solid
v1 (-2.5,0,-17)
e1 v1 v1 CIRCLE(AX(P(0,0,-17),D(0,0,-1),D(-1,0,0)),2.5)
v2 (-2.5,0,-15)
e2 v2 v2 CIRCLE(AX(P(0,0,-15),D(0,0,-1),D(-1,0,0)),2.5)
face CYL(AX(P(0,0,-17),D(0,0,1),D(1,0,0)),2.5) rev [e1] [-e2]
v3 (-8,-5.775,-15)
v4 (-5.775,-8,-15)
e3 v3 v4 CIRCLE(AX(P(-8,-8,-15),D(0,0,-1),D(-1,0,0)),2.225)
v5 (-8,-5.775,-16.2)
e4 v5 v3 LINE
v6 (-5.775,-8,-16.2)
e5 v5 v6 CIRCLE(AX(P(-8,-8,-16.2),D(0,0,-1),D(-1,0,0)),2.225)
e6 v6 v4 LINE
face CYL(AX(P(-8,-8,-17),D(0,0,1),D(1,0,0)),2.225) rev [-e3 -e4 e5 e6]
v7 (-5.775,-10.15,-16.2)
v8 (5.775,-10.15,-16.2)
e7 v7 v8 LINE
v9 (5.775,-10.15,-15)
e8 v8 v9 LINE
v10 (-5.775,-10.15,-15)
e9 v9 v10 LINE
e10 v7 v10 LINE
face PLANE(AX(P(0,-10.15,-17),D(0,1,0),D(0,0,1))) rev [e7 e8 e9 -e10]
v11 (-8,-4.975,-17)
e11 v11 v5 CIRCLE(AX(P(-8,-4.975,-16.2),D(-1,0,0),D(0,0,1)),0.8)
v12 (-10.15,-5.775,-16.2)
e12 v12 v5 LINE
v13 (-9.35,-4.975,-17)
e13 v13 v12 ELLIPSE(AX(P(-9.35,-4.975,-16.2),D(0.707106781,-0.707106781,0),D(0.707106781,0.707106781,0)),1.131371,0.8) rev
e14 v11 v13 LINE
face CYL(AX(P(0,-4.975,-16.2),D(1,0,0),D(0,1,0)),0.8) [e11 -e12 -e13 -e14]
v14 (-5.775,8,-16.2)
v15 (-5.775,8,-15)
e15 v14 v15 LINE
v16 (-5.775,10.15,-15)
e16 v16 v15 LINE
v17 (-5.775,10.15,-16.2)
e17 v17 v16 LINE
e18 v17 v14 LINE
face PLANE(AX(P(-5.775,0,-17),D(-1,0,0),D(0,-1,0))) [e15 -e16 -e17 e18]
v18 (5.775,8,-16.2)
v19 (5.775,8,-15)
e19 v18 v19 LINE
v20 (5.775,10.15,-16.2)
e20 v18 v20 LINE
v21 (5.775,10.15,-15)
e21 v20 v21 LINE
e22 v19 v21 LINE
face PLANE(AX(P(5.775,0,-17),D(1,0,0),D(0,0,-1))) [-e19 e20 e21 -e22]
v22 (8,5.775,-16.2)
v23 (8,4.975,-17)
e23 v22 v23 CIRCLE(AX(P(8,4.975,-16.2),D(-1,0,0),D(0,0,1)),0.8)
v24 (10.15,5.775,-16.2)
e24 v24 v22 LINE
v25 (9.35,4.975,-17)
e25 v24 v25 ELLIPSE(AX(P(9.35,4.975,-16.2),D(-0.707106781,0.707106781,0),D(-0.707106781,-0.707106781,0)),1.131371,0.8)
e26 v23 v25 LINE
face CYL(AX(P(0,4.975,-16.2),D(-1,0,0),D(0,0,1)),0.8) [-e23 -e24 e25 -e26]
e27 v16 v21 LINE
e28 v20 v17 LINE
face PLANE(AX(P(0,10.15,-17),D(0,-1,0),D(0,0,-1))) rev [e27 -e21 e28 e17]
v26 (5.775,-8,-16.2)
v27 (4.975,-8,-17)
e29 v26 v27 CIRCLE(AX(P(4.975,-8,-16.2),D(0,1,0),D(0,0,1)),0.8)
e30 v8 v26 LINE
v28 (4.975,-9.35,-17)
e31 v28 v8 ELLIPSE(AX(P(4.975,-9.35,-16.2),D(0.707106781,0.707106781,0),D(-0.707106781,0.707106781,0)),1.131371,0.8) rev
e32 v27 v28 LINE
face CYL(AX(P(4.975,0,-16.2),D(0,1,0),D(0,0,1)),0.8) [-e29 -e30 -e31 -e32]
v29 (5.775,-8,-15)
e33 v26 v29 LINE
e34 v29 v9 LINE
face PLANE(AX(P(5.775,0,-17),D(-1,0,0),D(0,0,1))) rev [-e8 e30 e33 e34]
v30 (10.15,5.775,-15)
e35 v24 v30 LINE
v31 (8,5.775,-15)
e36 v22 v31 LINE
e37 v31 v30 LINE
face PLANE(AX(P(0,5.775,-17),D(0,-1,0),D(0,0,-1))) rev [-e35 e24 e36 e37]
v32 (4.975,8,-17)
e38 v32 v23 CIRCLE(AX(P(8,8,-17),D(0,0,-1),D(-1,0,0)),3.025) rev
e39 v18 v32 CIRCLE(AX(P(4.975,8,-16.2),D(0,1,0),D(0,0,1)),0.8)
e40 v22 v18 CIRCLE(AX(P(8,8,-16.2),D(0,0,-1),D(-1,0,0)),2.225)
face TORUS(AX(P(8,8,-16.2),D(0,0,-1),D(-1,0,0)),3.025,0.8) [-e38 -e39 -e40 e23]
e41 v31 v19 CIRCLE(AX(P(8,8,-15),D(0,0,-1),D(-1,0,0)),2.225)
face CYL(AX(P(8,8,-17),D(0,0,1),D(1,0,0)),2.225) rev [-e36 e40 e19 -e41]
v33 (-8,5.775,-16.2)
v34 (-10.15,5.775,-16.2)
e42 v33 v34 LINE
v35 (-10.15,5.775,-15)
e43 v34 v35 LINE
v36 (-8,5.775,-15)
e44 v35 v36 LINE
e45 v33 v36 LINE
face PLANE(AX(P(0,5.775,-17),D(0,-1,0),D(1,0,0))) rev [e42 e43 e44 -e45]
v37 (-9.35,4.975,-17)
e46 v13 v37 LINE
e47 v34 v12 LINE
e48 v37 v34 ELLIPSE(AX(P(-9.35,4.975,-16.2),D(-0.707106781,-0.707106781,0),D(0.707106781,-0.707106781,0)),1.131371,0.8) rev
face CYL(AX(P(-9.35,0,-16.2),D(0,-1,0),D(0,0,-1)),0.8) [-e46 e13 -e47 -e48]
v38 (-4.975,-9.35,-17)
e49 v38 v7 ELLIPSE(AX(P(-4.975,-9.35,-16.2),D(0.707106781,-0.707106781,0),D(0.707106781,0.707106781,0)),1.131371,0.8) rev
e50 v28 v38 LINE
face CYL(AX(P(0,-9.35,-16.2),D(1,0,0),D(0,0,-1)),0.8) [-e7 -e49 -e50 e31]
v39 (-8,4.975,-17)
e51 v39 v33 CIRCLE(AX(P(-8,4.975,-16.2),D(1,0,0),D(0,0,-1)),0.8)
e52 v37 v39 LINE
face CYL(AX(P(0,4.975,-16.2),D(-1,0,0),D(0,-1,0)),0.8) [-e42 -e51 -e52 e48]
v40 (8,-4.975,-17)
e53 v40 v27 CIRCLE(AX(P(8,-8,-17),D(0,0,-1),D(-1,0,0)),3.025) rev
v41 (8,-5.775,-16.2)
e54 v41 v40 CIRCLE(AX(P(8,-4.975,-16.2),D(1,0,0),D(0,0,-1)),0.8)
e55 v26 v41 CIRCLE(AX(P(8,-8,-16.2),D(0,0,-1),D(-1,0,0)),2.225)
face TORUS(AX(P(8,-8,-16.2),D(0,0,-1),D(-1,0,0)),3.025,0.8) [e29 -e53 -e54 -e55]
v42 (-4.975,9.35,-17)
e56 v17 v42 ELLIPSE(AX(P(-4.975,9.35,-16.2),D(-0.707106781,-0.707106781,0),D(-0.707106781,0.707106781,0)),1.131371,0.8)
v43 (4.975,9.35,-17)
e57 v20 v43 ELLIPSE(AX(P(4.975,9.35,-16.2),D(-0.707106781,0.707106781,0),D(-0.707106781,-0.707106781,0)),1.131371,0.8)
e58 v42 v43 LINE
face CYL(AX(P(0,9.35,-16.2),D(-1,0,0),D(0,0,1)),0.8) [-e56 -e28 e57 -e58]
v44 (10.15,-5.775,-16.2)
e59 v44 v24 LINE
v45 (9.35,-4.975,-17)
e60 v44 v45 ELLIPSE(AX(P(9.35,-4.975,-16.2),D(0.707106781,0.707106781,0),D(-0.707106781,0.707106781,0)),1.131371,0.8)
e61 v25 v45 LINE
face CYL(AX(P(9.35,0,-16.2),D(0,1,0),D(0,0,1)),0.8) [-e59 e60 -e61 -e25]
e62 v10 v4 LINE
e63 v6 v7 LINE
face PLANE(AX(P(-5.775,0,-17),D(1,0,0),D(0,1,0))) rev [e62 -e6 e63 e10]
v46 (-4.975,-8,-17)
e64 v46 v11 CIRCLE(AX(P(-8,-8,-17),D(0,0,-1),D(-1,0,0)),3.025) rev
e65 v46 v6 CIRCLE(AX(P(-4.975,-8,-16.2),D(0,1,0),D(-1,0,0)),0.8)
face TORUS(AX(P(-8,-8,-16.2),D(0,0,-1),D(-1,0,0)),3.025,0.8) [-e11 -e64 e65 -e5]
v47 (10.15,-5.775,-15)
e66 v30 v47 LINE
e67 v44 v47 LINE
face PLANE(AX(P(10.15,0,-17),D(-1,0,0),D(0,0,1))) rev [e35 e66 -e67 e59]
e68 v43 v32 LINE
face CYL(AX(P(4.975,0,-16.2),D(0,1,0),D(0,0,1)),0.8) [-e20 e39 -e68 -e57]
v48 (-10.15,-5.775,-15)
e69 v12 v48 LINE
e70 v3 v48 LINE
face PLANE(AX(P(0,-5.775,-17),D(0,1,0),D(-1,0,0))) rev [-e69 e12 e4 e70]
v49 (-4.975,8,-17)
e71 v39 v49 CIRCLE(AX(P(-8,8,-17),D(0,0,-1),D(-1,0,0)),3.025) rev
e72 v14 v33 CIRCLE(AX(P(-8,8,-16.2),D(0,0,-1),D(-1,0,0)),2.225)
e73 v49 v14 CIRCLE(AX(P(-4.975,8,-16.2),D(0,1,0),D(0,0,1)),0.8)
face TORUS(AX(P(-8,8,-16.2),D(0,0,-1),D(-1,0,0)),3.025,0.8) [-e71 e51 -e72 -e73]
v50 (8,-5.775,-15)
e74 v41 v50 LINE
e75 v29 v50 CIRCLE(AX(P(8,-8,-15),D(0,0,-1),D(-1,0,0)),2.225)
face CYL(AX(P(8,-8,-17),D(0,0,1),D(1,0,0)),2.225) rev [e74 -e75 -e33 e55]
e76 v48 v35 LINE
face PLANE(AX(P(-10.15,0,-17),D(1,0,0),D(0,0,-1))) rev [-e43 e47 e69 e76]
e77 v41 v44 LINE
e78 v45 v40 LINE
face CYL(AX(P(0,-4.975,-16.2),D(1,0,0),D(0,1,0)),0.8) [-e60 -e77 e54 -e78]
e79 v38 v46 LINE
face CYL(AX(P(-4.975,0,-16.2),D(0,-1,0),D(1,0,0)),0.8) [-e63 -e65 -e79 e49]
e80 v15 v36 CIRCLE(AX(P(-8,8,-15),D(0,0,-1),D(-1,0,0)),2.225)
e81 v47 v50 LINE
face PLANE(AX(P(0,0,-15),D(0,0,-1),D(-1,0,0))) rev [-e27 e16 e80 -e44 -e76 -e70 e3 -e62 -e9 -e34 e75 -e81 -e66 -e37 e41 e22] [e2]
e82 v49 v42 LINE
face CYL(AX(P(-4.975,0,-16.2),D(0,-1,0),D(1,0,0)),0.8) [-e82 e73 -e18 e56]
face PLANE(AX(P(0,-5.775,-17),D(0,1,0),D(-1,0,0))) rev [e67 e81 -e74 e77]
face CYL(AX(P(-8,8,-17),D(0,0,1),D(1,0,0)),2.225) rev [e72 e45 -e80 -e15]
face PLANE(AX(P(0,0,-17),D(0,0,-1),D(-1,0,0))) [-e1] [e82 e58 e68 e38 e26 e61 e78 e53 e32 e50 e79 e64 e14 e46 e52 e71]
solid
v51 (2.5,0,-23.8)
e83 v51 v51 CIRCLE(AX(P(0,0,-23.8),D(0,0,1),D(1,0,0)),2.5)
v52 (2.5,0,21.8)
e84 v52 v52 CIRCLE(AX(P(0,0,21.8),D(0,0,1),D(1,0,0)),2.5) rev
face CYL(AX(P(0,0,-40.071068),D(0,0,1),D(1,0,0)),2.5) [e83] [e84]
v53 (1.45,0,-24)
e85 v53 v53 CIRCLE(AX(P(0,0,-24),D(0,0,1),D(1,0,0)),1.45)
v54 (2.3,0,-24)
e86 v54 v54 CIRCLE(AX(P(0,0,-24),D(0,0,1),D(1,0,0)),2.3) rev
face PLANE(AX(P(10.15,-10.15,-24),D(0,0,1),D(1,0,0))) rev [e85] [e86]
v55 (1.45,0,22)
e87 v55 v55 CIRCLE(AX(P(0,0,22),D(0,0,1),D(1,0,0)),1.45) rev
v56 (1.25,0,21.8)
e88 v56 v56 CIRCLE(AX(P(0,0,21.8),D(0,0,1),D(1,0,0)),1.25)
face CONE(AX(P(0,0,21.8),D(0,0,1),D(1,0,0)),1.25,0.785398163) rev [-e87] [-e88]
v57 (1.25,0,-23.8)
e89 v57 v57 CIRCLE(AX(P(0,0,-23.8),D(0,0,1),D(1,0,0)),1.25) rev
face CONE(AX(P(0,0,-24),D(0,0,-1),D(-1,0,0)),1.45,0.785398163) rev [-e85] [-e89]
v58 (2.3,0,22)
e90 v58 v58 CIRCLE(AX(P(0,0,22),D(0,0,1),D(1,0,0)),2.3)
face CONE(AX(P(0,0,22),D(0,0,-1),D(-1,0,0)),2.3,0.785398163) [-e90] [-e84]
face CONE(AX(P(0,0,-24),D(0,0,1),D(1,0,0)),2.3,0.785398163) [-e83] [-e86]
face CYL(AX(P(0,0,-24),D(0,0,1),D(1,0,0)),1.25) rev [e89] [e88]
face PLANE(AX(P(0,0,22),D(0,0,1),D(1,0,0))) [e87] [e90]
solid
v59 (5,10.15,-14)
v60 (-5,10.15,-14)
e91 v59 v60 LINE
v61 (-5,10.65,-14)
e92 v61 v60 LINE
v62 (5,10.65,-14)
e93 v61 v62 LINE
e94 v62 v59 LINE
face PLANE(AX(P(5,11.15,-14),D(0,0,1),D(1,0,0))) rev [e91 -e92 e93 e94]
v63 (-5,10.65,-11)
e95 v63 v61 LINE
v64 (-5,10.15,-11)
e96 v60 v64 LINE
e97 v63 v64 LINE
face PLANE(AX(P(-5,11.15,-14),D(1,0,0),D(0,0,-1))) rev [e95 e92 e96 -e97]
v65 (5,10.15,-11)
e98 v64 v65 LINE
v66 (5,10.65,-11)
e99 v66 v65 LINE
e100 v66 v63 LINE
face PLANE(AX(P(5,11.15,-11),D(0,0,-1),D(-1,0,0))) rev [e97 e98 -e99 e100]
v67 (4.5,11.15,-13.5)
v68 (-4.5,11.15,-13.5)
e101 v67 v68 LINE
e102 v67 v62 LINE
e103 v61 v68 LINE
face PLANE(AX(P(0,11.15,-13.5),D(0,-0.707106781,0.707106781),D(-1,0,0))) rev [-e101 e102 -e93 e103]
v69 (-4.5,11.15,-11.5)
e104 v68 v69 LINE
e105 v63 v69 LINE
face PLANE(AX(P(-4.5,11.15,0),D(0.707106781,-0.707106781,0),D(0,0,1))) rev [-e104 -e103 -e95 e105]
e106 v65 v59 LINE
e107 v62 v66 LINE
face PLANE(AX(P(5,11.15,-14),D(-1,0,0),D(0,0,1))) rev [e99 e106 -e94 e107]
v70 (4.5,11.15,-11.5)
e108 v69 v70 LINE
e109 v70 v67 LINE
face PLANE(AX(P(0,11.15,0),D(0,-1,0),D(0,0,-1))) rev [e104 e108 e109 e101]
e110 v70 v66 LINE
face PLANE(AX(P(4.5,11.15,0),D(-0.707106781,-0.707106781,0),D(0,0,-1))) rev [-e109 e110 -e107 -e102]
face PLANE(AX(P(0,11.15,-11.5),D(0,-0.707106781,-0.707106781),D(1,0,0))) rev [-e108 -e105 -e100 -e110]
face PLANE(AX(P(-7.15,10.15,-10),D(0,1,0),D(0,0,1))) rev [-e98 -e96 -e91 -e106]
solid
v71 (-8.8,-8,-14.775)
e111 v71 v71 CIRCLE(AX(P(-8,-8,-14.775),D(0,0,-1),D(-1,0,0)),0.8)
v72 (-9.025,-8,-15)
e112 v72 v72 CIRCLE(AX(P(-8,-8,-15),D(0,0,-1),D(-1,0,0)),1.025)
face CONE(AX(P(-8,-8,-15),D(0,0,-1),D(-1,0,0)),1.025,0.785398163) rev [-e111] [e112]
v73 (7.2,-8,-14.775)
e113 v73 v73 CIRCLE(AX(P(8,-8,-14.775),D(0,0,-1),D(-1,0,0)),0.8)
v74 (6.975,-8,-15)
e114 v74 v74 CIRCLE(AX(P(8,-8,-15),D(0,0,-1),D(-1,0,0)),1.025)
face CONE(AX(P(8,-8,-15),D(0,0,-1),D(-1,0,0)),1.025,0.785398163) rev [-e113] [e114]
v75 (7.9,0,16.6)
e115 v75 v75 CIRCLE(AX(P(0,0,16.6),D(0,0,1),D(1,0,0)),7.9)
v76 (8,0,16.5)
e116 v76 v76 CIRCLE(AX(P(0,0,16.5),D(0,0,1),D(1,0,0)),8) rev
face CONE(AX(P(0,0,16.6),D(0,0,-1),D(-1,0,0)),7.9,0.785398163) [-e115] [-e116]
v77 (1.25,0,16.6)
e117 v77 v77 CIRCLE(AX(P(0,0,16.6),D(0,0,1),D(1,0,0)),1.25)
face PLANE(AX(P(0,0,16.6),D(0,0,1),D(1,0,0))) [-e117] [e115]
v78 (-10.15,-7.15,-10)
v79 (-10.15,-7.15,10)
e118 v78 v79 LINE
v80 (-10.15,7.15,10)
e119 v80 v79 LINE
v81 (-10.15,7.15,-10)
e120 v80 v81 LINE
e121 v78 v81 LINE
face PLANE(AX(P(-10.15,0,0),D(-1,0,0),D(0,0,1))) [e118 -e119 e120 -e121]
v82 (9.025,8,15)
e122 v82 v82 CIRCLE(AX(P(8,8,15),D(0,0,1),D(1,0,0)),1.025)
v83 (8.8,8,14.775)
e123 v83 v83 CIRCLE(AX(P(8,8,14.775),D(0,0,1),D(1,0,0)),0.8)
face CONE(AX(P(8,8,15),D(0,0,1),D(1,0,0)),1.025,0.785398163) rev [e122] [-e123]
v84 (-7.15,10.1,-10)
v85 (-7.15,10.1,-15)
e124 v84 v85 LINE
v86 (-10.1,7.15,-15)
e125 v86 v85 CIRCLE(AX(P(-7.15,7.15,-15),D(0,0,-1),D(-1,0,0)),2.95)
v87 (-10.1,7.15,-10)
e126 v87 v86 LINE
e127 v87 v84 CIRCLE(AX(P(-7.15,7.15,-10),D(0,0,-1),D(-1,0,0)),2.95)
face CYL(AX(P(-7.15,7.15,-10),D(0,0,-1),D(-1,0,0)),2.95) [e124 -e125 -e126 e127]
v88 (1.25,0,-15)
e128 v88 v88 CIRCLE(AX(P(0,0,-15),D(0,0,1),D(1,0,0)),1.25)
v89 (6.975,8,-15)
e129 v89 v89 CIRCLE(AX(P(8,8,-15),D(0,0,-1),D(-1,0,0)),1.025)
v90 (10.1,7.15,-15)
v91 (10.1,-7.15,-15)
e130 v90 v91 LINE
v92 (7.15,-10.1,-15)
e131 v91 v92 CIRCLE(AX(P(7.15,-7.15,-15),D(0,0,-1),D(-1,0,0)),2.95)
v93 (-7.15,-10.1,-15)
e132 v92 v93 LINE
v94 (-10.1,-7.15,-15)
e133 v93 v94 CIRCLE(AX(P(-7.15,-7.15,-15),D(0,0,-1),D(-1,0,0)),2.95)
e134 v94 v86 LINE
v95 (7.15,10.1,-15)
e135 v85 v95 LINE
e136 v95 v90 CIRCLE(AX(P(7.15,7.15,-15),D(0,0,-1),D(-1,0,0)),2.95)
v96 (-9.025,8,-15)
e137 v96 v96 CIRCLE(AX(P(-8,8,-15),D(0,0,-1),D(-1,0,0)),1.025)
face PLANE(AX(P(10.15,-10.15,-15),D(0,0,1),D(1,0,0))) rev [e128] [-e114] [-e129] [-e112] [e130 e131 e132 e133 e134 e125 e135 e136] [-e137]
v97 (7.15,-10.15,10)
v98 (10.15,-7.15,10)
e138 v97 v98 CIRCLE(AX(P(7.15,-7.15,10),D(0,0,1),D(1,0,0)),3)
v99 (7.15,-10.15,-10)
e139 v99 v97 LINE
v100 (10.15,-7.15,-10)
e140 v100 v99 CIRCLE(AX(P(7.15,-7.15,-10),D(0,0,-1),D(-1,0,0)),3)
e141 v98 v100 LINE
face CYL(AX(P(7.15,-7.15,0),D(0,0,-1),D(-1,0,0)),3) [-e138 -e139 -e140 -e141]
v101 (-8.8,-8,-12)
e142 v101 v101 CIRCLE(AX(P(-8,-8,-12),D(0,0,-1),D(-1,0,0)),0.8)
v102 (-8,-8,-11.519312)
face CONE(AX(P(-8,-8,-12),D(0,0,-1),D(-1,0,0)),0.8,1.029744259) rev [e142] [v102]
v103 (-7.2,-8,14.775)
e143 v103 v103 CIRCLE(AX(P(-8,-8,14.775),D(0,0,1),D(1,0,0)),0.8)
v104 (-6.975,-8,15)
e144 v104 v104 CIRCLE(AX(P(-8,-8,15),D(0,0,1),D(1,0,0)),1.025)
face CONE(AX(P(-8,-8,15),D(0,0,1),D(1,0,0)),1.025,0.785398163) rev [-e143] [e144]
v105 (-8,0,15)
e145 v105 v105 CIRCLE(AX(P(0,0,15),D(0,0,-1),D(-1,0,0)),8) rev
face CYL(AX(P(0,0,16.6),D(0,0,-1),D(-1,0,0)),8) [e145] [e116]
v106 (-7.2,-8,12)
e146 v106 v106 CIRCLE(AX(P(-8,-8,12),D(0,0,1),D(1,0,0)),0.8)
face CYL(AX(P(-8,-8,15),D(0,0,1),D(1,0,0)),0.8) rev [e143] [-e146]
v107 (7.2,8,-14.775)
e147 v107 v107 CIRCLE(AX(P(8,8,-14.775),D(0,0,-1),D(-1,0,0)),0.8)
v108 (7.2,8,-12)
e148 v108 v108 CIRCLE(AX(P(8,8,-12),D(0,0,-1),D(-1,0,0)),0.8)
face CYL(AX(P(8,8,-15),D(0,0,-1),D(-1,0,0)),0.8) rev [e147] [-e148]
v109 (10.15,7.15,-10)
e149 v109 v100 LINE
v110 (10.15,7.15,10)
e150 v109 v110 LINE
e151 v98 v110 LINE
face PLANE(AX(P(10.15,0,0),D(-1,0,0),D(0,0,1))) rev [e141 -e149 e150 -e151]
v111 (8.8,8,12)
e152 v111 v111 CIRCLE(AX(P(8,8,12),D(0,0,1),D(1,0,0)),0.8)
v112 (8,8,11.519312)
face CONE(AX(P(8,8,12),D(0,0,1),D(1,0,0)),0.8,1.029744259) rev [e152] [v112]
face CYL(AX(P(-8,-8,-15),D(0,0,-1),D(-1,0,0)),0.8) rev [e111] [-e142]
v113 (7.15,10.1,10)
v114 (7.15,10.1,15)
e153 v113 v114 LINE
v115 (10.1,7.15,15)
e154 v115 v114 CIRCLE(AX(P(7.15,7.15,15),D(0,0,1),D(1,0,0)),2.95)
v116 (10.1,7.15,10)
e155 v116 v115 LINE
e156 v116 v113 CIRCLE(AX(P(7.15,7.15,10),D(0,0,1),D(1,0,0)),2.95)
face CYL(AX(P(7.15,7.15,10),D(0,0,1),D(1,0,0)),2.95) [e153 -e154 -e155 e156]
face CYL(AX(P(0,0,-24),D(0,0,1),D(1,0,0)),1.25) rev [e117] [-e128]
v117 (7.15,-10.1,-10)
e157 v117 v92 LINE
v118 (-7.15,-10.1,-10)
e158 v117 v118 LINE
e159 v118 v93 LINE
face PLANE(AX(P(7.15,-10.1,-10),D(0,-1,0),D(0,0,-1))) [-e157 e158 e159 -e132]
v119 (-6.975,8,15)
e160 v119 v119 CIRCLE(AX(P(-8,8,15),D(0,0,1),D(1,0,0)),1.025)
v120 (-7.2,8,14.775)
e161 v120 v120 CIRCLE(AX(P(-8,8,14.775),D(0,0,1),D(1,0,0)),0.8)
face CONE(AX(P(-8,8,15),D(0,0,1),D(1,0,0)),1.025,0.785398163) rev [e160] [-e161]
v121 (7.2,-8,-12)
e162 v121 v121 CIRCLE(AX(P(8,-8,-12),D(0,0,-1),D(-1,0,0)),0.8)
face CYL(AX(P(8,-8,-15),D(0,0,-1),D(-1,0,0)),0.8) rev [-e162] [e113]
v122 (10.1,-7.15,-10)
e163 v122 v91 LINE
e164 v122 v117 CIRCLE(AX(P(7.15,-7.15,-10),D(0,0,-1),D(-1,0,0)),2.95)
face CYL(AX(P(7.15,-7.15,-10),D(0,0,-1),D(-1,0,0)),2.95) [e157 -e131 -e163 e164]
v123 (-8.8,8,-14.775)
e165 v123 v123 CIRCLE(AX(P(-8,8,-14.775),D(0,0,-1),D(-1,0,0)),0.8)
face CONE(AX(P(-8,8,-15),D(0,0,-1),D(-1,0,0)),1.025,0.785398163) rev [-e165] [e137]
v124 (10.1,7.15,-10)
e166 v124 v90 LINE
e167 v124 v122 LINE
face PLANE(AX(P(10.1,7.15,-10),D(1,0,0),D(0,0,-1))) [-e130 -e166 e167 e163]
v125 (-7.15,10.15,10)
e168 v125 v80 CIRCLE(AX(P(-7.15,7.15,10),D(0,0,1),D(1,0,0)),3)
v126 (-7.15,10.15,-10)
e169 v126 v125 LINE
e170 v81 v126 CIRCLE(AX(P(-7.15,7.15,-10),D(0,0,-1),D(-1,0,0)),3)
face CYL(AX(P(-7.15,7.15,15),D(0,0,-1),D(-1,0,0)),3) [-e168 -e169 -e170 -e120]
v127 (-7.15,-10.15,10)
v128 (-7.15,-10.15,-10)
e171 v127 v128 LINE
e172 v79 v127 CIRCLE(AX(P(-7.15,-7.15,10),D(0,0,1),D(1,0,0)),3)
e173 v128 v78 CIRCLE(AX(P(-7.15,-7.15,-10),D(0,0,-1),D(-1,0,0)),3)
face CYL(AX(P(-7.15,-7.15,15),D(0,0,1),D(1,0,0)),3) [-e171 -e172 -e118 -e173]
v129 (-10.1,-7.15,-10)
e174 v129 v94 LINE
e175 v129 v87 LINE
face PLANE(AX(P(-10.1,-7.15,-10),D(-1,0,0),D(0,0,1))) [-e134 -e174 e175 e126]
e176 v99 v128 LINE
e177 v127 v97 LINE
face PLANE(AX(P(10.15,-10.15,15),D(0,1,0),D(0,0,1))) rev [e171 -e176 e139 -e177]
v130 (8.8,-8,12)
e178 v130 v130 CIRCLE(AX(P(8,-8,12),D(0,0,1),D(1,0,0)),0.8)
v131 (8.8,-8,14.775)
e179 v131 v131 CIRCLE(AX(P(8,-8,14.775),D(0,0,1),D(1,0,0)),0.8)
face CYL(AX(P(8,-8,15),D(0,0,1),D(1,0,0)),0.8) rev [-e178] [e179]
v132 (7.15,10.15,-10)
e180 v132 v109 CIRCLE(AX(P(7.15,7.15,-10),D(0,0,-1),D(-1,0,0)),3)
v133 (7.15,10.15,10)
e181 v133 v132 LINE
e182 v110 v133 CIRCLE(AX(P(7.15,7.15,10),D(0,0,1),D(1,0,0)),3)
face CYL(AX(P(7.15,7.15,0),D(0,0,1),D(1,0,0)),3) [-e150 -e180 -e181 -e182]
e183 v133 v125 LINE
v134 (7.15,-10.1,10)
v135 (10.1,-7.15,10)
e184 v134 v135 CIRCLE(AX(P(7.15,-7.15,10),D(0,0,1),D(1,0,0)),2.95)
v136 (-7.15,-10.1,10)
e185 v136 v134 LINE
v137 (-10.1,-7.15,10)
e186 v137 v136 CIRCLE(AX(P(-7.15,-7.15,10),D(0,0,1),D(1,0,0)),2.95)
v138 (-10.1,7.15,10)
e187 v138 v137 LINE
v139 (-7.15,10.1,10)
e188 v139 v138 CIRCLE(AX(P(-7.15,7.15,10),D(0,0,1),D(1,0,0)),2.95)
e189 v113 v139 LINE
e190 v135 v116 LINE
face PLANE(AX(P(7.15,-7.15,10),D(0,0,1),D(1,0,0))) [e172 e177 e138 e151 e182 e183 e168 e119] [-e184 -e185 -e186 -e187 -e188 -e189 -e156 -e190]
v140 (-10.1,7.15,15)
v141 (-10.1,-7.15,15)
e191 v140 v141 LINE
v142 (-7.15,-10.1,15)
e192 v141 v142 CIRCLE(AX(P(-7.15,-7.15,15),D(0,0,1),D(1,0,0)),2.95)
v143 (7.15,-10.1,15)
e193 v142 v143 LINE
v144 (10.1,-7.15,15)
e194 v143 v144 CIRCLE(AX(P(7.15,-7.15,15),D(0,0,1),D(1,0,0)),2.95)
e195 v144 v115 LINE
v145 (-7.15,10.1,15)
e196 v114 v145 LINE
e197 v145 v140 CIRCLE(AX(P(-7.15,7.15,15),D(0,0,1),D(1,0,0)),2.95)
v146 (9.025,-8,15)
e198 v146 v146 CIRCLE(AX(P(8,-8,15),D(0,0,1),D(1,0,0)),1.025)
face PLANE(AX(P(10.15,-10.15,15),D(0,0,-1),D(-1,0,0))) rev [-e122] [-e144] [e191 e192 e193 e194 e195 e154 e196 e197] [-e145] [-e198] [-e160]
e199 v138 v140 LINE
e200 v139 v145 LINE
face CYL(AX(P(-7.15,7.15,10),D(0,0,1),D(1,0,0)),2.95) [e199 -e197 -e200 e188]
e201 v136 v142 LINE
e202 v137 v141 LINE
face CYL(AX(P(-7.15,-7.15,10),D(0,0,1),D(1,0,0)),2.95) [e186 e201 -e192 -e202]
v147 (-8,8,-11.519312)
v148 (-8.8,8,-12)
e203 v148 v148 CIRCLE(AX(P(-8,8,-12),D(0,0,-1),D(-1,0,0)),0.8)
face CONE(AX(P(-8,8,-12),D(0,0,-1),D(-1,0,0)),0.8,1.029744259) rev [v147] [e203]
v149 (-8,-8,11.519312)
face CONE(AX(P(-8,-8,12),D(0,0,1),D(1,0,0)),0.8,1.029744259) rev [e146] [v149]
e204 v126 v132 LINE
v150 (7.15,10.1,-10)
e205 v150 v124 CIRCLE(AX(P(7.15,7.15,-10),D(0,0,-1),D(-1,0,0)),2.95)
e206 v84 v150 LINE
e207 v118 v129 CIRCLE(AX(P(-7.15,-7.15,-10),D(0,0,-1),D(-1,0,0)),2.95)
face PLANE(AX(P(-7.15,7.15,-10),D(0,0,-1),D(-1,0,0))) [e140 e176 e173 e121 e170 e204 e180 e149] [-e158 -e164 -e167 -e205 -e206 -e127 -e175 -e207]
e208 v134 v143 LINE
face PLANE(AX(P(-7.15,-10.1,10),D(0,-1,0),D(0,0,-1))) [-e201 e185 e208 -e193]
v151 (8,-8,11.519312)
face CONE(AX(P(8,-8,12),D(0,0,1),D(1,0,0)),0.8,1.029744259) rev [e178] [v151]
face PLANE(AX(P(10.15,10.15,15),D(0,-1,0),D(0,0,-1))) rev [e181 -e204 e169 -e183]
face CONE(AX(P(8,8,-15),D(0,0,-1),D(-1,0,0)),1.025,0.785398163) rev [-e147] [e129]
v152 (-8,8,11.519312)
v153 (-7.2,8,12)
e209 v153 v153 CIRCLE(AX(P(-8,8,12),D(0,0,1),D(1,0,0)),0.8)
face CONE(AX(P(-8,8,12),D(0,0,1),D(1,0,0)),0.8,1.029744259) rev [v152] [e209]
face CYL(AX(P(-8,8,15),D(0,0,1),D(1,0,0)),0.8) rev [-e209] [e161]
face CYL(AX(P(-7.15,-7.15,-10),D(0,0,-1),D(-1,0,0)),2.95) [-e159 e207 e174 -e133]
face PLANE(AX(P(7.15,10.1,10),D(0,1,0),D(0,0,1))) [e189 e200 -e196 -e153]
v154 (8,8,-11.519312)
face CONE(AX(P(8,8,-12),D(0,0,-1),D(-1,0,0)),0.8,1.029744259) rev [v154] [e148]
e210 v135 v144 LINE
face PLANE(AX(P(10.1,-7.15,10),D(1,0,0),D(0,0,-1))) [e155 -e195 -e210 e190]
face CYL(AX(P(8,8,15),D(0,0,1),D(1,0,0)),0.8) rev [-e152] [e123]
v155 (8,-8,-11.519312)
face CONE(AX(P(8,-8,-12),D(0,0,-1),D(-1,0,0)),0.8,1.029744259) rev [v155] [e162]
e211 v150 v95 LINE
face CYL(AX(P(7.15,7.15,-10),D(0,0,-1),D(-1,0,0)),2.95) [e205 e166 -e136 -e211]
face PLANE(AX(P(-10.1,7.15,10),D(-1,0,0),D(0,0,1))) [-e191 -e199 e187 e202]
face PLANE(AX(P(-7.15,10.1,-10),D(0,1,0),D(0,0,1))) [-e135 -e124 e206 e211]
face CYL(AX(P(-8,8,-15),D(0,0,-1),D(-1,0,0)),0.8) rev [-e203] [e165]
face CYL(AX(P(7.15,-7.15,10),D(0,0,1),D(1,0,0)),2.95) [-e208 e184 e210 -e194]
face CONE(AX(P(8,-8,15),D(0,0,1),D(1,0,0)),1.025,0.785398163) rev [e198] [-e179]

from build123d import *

# Parameters (mm, degrees)
MAIN_SKETCH_W                          = 30
MAIN_SKETCH_H                          = 20.3
MAIN_BODY_EXTRUDE_DEPTH                = 10.15
BOTTOM_CIRCULAR_PROTRUSION_SKETCH_R    = 8
BOTTOM_CIRCULAR_PROTRUSION_DEPTH       = 1.6
BOTTOM_PROTRUSION_CHAMFER_SIZE         = 0.1
SHAFT_OUTSIDE_DEPTH                    = 5.4
SHAFT_OUTSIDE_DEPTH_BACK               = 40.6
SHAFT_OUTSIDE_SKETCH_R                 = 2.5
HOLLOW_OUT_SHAFT_CUT_DEPTH             = 49.18760214
HOLLOW_OUT_SHAFT_CUT_DEPTH_BACK        = 49.18760214
SKETCH4_R                              = 1.25
SHAFT_CHAMFER_SIZE                     = 0.2
MOUNTING_HOLE_LOCATION_SKETCH_R        = 0.5
MOUNTING_HOLE_CUT_LOCATIONS_DEPTH      = 2
ASSEMBLY_START                         = -2
ASSEMBLY_SCREW_HOLES_POSITION_SKETCH_R = 0.5
ASSEMBLY_SCREW_HOLES_DEPTH             = 2
BODY_CORNER_FILLETS_R                  = 3
COVER_SKETCH_R                         = 2.5
COVER_EXTRUDE_DEPTH                    = 2
COVER_FILLET_R                         = 0.8
CONNECTOR_SKETCH_W                     = 10
CONNECTOR_SKETCH_H                     = 3
CONNECTOR_EXTRUDE_DEPTH                = 1
CONNECTOR_CHAMFER_SIZE                 = 0.5
BODY_BOTTOM_TRIM_DEPTH                 = 5
BODY_START                             = -5
BODY_TOP_TRIM_DEPTH                    = 5


# Read off the part's stored shape, not the designer's step: M2 Tapped Holes
with BuildPart() as part:
    # Main Sketch → Main Body Extrude (new, symmetric)
    with BuildSketch(Plane(origin=(0, 0, 0), x_dir=(0, 0, -1), z_dir=(1, 0, 0))):
        Rectangle(MAIN_SKETCH_W, MAIN_SKETCH_H)
    extrude(amount=MAIN_BODY_EXTRUDE_DEPTH, both=True)

    # Bottom Circular Protrusion Sketch → Bottom Circular Protrusion (add)
    with BuildSketch(Plane.XY.offset(15)):
        with Locations(Location((0, 0, 0), (0, 0, 180))):
            Circle(BOTTOM_CIRCULAR_PROTRUSION_SKETCH_R)
    extrude(amount=BOTTOM_CIRCULAR_PROTRUSION_DEPTH)

    # Bottom Protrusion Chamfer
    bottom_protrusion_chamfer_edges = [part.edges().sort_by_distance(p)[0] for p in [
        (8, 0, 16.6),
    ]]
    chamfer(bottom_protrusion_chamfer_edges, length=BOTTOM_PROTRUSION_CHAMFER_SIZE)


with BuildPart() as body_2:
    # Shaft Outside Sketch → Shaft Outside (new, two sides: drawn at the far end of the back side and taken through both)
    with BuildSketch(Plane.XY.offset(16.6).offset(-SHAFT_OUTSIDE_DEPTH_BACK)):
        Circle(SHAFT_OUTSIDE_SKETCH_R)
    extrude(amount=SHAFT_OUTSIDE_DEPTH + SHAFT_OUTSIDE_DEPTH_BACK)


with BuildPart() as hollow_out_shaft_cut_tool:
    # Sketch4 → Hollow Out Shaft Cut (new, two sides: drawn at the far end of the back side and taken through both)
    with BuildSketch(Plane.XY.offset(22).offset(-HOLLOW_OUT_SHAFT_CUT_DEPTH_BACK)):
        Circle(SKETCH4_R)
    extrude(amount=HOLLOW_OUT_SHAFT_CUT_DEPTH + HOLLOW_OUT_SHAFT_CUT_DEPTH_BACK)


with BuildPart() as part_1:
    add(part.part)

    # Hollow Out Shaft Cut: cut by hollow_out_shaft_cut_tool
    add(hollow_out_shaft_cut_tool.part, mode=Mode.SUBTRACT)

    # Mounting Hole Location Sketch → Mounting Hole Cut Locations (cut)
    with BuildSketch(Plane.XY.offset(15)):
        with Locations((-8, 8)):
            Circle(MOUNTING_HOLE_LOCATION_SKETCH_R)
        with Locations((8, 8)):
            Circle(MOUNTING_HOLE_LOCATION_SKETCH_R)
        with Locations((8, -8)):
            Circle(MOUNTING_HOLE_LOCATION_SKETCH_R)
        with Locations((-8, -8)):
            Circle(MOUNTING_HOLE_LOCATION_SKETCH_R)
    extrude(amount=-MOUNTING_HOLE_CUT_LOCATIONS_DEPTH, mode=Mode.SUBTRACT)

    # Assembly Screw Holes Position Sketch → Assembly Screw Holes (cut)
    with BuildSketch(Plane(origin=(0, 0, -15), x_dir=(-1, 0, 0), z_dir=(0, 0, -1)).offset(ASSEMBLY_START)):
        with Locations(Location((8, -8, 0), (0, 0, 180))):
            Circle(ASSEMBLY_SCREW_HOLES_POSITION_SKETCH_R)
        with Locations(Location((-8, -8, 0), (0, 0, 180))):
            Circle(ASSEMBLY_SCREW_HOLES_POSITION_SKETCH_R)
        with Locations(Location((-8, 8, 0), (0, 0, 180))):
            Circle(ASSEMBLY_SCREW_HOLES_POSITION_SKETCH_R)
        with Locations(Location((8, 8, 0), (0, 0, 180))):
            Circle(ASSEMBLY_SCREW_HOLES_POSITION_SKETCH_R)
    extrude(amount=ASSEMBLY_SCREW_HOLES_DEPTH, mode=Mode.SUBTRACT)

    # M2 Tapped Holes outline → M2 Tapped Holes (revolve, cut)
    with BuildSketch(Plane(origin=(-8, 8, 0), x_dir=(1, 0, 0), z_dir=(0, -1, 0))):
        Polygon((0, -11.519311505), (0, -13), (0.5, -13), (0.5, -15), (1.025, -15), (0.8, -14.775), (0.8, -12), align=None)
        Polygon((0, 13), (0, 11.519311505), (0.8, 12), (0.8, 14.775), (1.025, 15), (0.5, 15), (0.5, 13), align=None)
    revolve(axis=Axis((-8, 8, 0), (0, 0, 1)), mode=Mode.SUBTRACT)

    # M2 Tapped Holes 2 outline → M2 Tapped Holes 2 (revolve, cut)
    with BuildSketch(Plane(origin=(8, -8, 0), x_dir=(1, 0, 0), z_dir=(0, -1, 0))):
        Polygon((0, -11.519311505), (0, -13), (0.5, -13), (0.5, -15), (1.025, -15), (0.8, -14.775), (0.8, -12), align=None)
        Polygon((0, 13), (0, 11.519311505), (0.8, 12), (0.8, 14.775), (1.025, 15), (0.5, 15), (0.5, 13), align=None)
    revolve(axis=Axis((8, -8, 0), (0, 0, 1)), mode=Mode.SUBTRACT)

    # M2 Tapped Holes 3 outline → M2 Tapped Holes 3 (revolve, cut)
    with BuildSketch(Plane(origin=(8, 8, 0), x_dir=(1, 0, 0), z_dir=(0, -1, 0))):
        Polygon((0, -11.519311505), (0, -13), (0.5, -13), (0.5, -15), (1.025, -15), (0.8, -14.775), (0.8, -12), align=None)
        Polygon((0, 13), (0, 11.519311505), (0.8, 12), (0.8, 14.775), (1.025, 15), (0.5, 15), (0.5, 13), align=None)
    revolve(axis=Axis((8, 8, 0), (0, 0, 1)), mode=Mode.SUBTRACT)

    # M2 Tapped Holes 4 outline → M2 Tapped Holes 4 (revolve, cut)
    with BuildSketch(Plane(origin=(-8, -8, 0), x_dir=(1, 0, 0), z_dir=(0, -1, 0))):
        Polygon((0, -11.519311505), (0, -13), (0.5, -13), (0.5, -15), (1.025, -15), (0.8, -14.775), (0.8, -12), align=None)
        Polygon((0, 13), (0, 11.519311505), (0.8, 12), (0.8, 14.775), (1.025, 15), (0.5, 15), (0.5, 13), align=None)
    revolve(axis=Axis((-8, -8, 0), (0, 0, 1)), mode=Mode.SUBTRACT)

    # Body Corner Fillets
    body_corner_fillets_edges = [part_1.edges().sort_by_distance(p)[0] for p in [
        (10.15, -10.15, 0),
        (-10.15, -10.15, 0),
        (-10.15, 10.15, 0),
        (10.15, 10.15, 0),
    ]]
    fillet(body_corner_fillets_edges, radius=BODY_CORNER_FILLETS_R)

    # Connector Sketch → Connector Extrude (add)
    with BuildSketch(Plane(origin=(0, 10.15, 0), x_dir=(1, 0, 0), z_dir=(0, 1, 0))):
        with Locations((0, 12.5)):
            Rectangle(CONNECTOR_SKETCH_W, CONNECTOR_SKETCH_H)
    extrude(amount=CONNECTOR_EXTRUDE_DEPTH)

    # Connector Chamfer
    connector_chamfer_edges = [part_1.edges().sort_by_distance(p)[0] for p in [
        (-5, 11.15, -12.5),
        (0, 11.15, -11),
        (5, 11.15, -12.5),
        (0, 11.15, -14),
    ]]
    chamfer(connector_chamfer_edges, length=CONNECTOR_CHAMFER_SIZE)

    # Body Top Trim Sketch → Body Bottom Trim (cut)
    with BuildSketch(Plane.XY.offset(15)):
        with BuildLine():
            Line((10.15, -7.15), (10.15, 7.15))
            ThreePointArc((10.15, 7.15), (9.271320344, 9.271320344), (7.15, 10.15))
            Line((7.15, 10.15), (-7.15, 10.15))
            ThreePointArc((-7.15, 10.15), (-9.271320344, 9.271320344), (-10.15, 7.15))
            Line((-10.15, 7.15), (-10.15, -7.15))
            ThreePointArc((-10.15, -7.15), (-9.271320344, -9.271320344), (-7.15, -10.15))
            Line((-7.15, -10.15), (7.15, -10.15))
            ThreePointArc((7.15, -10.15), (9.271320344, -9.271320344), (10.15, -7.15))
        make_face()
        with BuildLine():
            Line((10.1, -7.15), (10.1, 7.15))
            ThreePointArc((10.1, 7.15), (9.235965005, 9.235965005), (7.15, 10.1))
            Line((7.15, 10.1), (-7.15, 10.1))
            ThreePointArc((-7.15, 10.1), (-9.235965005, 9.235965005), (-10.1, 7.15))
            Line((-10.1, 7.15), (-10.1, -7.15))
            ThreePointArc((-10.1, -7.15), (-9.235965005, -9.235965005), (-7.15, -10.1))
            Line((-7.15, -10.1), (7.15, -10.1))
            ThreePointArc((7.15, -10.1), (9.235965005, -9.235965005), (10.1, -7.15))
        make_face(mode=Mode.SUBTRACT)
    extrude(amount=-BODY_BOTTOM_TRIM_DEPTH, mode=Mode.SUBTRACT)

    # Body Bottom Trim Sketch → Body Top Trim (cut)
    with BuildSketch(Plane(origin=(0, 0, -15), x_dir=(-1, 0, 0), z_dir=(0, 0, -1)).offset(BODY_START)):
        with BuildLine():
            Line((7.15, 10.15), (-7.15, 10.15))
            ThreePointArc((-7.15, 10.15), (-9.271320344, 9.271320344), (-10.15, 7.15))
            Line((-10.15, 7.15), (-10.15, -7.15))
            ThreePointArc((-10.15, -7.15), (-9.271320344, -9.271320344), (-7.15, -10.15))
            Line((-7.15, -10.15), (7.15, -10.15))
            ThreePointArc((7.15, -10.15), (9.271320344, -9.271320344), (10.15, -7.15))
            Line((10.15, -7.15), (10.15, 7.15))
            ThreePointArc((10.15, 7.15), (9.271320344, 9.271320344), (7.15, 10.15))
        make_face()
        with BuildLine():
            Line((-10.1, 7.15), (-10.1, -7.15))
            ThreePointArc((-10.1, -7.15), (-9.235965005, -9.235965005), (-7.15, -10.1))
            Line((-7.15, -10.1), (7.15, -10.1))
            ThreePointArc((7.15, -10.1), (9.235965005, -9.235965005), (10.1, -7.15))
            Line((10.1, -7.15), (10.1, 7.15))
            ThreePointArc((10.1, 7.15), (9.235965005, 9.235965005), (7.15, 10.1))
            Line((7.15, 10.1), (-7.15, 10.1))
            ThreePointArc((-7.15, 10.1), (-9.235965005, 9.235965005), (-10.1, 7.15))
        make_face(mode=Mode.SUBTRACT)
    extrude(amount=BODY_TOP_TRIM_DEPTH, mode=Mode.SUBTRACT)


with BuildPart() as body_2_1:
    add(body_2.part)

    # Hollow Out Shaft Cut: cut by hollow_out_shaft_cut_tool
    add(hollow_out_shaft_cut_tool.part, mode=Mode.SUBTRACT)

    # Shaft Chamfer
    shaft_chamfer_edges = [body_2_1.edges().sort_by_distance(p)[0] for p in [
        (-1.25, 0, 22),
        (-1.25, 0, -24),
        (-2.5, 0, -24),
        (-2.5, 0, 22),
    ]]
    chamfer(shaft_chamfer_edges, length=SHAFT_CHAMFER_SIZE)


with BuildPart() as body_3:
    # Cover Sketch → Cover Extrude (new body)
    with BuildSketch(Plane(origin=(0, 0, -15), x_dir=(-1, 0, 0), z_dir=(0, 0, -1))):
        with BuildLine():
            ThreePointArc((-5.775, 8), (-6.426687412, 6.426687412), (-8, 5.775))
            Line((-8, 5.775), (-10.15, 5.775))
            Line((-10.15, 5.775), (-10.15, -5.775))
            Line((-10.15, -5.775), (-8, -5.775))
            ThreePointArc((-8, -5.775), (-6.426687412, -6.426687412), (-5.775, -8))
            Line((-5.775, -8), (-5.775, -10.15))
            Line((-5.775, -10.15), (5.775, -10.15))
            Line((5.775, -10.15), (5.775, -8))
            ThreePointArc((5.775, -8), (6.426687412, -6.426687412), (8, -5.775))
            Line((8, -5.775), (10.15, -5.775))
            Line((10.15, -5.775), (10.15, 5.775))
            Line((10.15, 5.775), (8, 5.775))
            ThreePointArc((8, 5.775), (6.426687412, 6.426687412), (5.775, 8))
            Line((5.775, 8), (5.775, 10.15))
            Line((5.775, 10.15), (-5.775, 10.15))
            Line((-5.775, 10.15), (-5.775, 8))
        make_face()
        Circle(COVER_SKETCH_R, mode=Mode.SUBTRACT)
    extrude(amount=COVER_EXTRUDE_DEPTH)

    # Cover Fillet
    cover_fillet_edges = [body_3.edges().sort_by_distance(p)[0] for p in [
        (-6.426687412, -6.426687412, -17),
        (-9.075, -5.775, -17),
        (-10.15, 0, -17),
        (-9.075, 5.775, -17),
        (-6.426687412, 6.426687412, -17),
        (-5.775, 9.075, -17),
        (0, 10.15, -17),
        (5.775, 9.075, -17),
        (6.426687412, 6.426687412, -17),
        (9.075, 5.775, -17),
        (10.15, 0, -17),
        (9.075, -5.775, -17),
        (6.426687412, -6.426687412, -17),
        (5.775, -9.075, -17),
        (0, -10.15, -17),
        (-5.775, -9.075, -17),
    ]]
    fillet(cover_fillet_edges, radius=COVER_FILLET_R)


with BuildPart() as body_top_trim_piece_1:
    # of the separate pieces the step leaves, piece 1, a body of its own (body_top_trim_pieces)
    add(part_1.part.solids().sort_by_distance((-7.15, 10.15, -10))[0])


with BuildPart() as body_top_trim_piece_2:
    # of the separate pieces the step leaves, piece 2, a body of its own (body_top_trim_pieces)
    add(part_1.part.solids().sort_by_distance((5, 10.65, -14))[0])


solid = Compound([body_2_1.part, body_3.part, body_top_trim_piece_1.part, body_top_trim_piece_2.part])
